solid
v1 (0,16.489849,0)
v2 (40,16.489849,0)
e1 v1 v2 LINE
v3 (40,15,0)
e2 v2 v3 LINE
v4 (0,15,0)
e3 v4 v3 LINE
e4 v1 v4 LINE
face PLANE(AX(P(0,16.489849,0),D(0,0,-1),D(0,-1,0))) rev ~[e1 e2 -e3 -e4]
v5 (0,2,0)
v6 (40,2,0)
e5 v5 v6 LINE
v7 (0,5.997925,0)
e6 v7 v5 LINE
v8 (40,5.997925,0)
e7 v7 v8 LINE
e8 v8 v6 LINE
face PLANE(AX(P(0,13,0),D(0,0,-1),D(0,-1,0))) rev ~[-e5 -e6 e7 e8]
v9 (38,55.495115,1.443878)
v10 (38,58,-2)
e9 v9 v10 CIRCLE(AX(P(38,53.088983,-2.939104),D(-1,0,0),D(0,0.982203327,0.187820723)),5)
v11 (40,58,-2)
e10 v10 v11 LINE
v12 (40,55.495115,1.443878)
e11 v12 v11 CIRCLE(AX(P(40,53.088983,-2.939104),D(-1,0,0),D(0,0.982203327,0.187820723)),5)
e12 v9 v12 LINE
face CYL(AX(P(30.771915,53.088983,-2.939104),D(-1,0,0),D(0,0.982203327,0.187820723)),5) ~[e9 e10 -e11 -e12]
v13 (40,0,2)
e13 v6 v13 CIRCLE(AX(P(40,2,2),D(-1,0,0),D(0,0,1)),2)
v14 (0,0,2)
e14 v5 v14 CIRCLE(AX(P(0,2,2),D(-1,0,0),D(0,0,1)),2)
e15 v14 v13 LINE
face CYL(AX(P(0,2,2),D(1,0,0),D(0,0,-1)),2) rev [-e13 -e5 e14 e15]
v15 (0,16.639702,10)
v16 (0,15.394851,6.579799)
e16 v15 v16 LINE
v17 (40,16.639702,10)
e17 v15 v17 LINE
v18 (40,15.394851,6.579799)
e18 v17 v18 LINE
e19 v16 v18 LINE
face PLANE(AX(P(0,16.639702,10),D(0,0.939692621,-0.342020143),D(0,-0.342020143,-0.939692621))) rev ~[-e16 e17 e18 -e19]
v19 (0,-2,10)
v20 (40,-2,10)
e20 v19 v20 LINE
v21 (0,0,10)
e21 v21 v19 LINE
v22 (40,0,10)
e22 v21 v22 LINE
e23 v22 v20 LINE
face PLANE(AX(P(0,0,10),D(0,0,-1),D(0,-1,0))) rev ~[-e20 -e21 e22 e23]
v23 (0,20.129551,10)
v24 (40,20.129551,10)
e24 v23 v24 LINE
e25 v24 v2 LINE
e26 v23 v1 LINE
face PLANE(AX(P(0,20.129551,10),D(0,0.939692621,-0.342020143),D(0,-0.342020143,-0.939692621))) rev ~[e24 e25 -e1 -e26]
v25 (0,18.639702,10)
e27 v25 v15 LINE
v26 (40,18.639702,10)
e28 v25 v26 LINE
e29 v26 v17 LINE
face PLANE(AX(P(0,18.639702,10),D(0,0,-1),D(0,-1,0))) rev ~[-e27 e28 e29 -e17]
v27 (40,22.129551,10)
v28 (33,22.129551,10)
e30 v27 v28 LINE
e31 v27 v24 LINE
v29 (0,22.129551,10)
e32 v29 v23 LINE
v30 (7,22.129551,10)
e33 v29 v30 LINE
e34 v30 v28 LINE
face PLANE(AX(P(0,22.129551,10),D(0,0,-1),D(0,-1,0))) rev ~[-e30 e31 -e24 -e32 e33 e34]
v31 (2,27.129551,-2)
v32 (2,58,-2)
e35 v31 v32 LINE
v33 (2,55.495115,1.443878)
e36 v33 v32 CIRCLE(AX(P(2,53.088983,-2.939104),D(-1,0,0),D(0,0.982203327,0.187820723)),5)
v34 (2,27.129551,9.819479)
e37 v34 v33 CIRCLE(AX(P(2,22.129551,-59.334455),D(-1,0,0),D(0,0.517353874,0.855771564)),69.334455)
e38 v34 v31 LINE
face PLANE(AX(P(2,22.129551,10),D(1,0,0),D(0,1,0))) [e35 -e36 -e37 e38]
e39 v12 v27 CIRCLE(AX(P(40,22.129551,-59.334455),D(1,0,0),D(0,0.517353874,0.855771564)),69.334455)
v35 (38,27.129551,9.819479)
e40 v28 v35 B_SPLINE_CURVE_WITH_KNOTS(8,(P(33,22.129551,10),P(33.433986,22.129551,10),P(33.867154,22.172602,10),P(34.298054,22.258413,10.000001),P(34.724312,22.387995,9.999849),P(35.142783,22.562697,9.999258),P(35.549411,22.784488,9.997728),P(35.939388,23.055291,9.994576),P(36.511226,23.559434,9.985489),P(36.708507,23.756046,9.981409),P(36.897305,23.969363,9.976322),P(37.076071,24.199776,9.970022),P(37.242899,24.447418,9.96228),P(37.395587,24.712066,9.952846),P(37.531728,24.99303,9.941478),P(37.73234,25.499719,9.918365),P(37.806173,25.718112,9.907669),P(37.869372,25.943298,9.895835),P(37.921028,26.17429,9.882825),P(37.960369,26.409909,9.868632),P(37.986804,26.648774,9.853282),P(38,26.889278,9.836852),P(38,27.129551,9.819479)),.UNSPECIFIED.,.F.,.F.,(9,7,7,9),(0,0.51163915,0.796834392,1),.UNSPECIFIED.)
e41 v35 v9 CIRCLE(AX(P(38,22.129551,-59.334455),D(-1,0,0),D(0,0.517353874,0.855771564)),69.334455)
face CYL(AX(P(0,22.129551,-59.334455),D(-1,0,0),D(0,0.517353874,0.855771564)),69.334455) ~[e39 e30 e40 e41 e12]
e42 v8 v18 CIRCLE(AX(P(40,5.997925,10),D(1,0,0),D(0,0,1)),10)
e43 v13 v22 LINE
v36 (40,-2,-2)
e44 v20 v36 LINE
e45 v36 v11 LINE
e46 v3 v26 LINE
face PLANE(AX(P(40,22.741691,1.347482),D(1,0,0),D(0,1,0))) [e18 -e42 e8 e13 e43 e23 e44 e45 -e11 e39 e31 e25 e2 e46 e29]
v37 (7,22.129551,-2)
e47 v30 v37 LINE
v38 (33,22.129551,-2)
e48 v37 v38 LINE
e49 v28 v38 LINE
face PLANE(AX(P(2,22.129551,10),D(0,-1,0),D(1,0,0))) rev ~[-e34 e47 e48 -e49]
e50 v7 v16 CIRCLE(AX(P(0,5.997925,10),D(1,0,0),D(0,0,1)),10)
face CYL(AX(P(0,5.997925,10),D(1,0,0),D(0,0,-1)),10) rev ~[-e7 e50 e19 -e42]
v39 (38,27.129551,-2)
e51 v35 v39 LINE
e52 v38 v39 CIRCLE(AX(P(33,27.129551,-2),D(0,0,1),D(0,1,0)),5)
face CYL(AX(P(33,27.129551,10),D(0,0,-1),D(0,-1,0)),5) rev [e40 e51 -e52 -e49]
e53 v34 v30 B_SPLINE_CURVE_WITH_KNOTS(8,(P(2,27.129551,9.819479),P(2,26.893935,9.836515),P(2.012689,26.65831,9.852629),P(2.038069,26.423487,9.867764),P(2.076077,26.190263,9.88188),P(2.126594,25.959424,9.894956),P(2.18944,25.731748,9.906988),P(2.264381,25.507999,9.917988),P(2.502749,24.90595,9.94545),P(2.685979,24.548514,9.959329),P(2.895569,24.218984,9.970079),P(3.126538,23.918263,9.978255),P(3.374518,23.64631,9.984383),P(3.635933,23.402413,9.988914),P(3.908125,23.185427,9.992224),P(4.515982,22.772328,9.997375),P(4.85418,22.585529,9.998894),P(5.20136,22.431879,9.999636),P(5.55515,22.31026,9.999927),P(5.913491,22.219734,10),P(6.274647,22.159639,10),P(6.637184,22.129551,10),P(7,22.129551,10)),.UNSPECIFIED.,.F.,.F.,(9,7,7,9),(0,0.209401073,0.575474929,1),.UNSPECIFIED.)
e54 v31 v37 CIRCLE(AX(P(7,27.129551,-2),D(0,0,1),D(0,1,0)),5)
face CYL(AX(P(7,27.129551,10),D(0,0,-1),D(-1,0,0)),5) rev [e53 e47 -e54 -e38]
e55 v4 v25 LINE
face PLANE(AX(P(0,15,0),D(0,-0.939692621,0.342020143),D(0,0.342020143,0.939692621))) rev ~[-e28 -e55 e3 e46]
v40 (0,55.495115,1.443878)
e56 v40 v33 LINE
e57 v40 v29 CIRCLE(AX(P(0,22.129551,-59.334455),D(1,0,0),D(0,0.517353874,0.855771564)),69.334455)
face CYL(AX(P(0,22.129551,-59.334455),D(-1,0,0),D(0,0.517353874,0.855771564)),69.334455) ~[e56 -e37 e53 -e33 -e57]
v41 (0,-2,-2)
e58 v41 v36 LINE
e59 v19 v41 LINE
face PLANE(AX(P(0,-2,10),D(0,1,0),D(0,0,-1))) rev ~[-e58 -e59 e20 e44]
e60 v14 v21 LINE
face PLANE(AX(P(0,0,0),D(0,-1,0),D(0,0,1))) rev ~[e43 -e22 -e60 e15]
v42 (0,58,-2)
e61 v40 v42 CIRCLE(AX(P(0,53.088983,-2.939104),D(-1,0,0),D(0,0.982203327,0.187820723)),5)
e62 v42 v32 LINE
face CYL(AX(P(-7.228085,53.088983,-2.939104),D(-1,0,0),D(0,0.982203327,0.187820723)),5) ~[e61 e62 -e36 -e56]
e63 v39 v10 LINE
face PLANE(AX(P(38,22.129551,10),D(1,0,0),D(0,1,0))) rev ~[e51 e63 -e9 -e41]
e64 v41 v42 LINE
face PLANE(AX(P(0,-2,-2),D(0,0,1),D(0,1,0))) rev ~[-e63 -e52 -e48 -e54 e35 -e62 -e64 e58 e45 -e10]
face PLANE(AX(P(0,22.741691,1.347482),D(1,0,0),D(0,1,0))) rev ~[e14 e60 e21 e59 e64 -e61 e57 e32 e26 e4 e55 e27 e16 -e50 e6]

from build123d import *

# Parameters (mm, degrees)
F1_DEPTH    = 40
F2_R        = 10
F3_R        = 2
F4_W        = 36
F4_H        = 35.8704487759
F5_DEPTH    = 25
F6_R        = 5
F7_T1_DEPTH = 16.4561700335
F7_T3_DEPTH = 16.4561700335


# Not quite as in the source:
# - a fillet or chamfer that OpenCascade refuses, or shapes differently, is made with other operations: its cross-section is extruded or revolved along the edge and cut away or added


with BuildPart() as f1:
    # F0 (on Right) → F1 (new body)
    with BuildSketch(Plane.YZ):
        Polygon((13, 0), (0, 0), (0, 10), (-2, 10), (-2, -2), (58, -2), (58, 0), (22.1295512241, 0), (22.1295512241, 10), (20.1295512241, 10), (16.4898488815, 0), (15, 0), (18.6397023427, 10), (16.6397023427, 10), align=None)
        with BuildLine():
            Line((22.1295512241, 0), (58, 0))
            ThreePointArc((58, 0), (40.7486885255, 7.4532263127), (22.1295512241, 10))
            Line((22.1295512241, 10), (22.1295512241, 0))
        make_face()
    extrude(amount=F1_DEPTH)

    # F2
    f2_edges = [f1.edges().sort_by_distance(p)[0] for p in [
        (20, 13, 0),
    ]]
    fillet(f2_edges, radius=F2_R)

    # F3
    f3_edges = [f1.edges().sort_by_distance(p)[0] for p in [
        (20, 0, 0),
    ]]
    fillet(f3_edges, radius=F3_R)

    # F4 (on face) → F5 (cut)
    with BuildSketch(Plane.XY.offset(10)):
        with Locations((20, 40.0647756121)):
            Rectangle(F4_W, F4_H)
    extrude(amount=-F5_DEPTH, mode=Mode.SUBTRACT)

    # F6
    f6_edges = [f1.edges().sort_by_distance(p)[0] for p in [
        (2, 22.129551, 4),
        (38, 22.129551, 4),
    ]]
    fillet(f6_edges, radius=F6_R)

    # F7: fillet of radius 5 on 2 edges, made by hand

    # F7_s2 → F7_t1 (cut)
    with BuildSketch(Plane.YZ.offset(-7.2280850168)):
        with BuildLine():
            ThreePointArc((58, -2), (57.132526229, 0.0019440058), (55.4951149029, 1.4438783647))
            ThreePointArc((55.4951149029, 1.4438783647), (56.7550844524, 0.7349972576), (58, 0))
            Line((58, 0), (58, -2))
        make_face()
    extrude(amount=F7_T1_DEPTH, mode=Mode.SUBTRACT)

    # F7_s4 → F7_t3 (cut)
    with BuildSketch(Plane.YZ.offset(30.7719149832)):
        with BuildLine():
            ThreePointArc((58, -2), (57.132526229, 0.0019440058), (55.4951149029, 1.4438783647))
            ThreePointArc((55.4951149029, 1.4438783647), (56.7550844524, 0.7349972576), (58, 0))
            Line((58, 0), (58, -2))
        make_face()
    extrude(amount=F7_T3_DEPTH, mode=Mode.SUBTRACT)


solid = f1.part
